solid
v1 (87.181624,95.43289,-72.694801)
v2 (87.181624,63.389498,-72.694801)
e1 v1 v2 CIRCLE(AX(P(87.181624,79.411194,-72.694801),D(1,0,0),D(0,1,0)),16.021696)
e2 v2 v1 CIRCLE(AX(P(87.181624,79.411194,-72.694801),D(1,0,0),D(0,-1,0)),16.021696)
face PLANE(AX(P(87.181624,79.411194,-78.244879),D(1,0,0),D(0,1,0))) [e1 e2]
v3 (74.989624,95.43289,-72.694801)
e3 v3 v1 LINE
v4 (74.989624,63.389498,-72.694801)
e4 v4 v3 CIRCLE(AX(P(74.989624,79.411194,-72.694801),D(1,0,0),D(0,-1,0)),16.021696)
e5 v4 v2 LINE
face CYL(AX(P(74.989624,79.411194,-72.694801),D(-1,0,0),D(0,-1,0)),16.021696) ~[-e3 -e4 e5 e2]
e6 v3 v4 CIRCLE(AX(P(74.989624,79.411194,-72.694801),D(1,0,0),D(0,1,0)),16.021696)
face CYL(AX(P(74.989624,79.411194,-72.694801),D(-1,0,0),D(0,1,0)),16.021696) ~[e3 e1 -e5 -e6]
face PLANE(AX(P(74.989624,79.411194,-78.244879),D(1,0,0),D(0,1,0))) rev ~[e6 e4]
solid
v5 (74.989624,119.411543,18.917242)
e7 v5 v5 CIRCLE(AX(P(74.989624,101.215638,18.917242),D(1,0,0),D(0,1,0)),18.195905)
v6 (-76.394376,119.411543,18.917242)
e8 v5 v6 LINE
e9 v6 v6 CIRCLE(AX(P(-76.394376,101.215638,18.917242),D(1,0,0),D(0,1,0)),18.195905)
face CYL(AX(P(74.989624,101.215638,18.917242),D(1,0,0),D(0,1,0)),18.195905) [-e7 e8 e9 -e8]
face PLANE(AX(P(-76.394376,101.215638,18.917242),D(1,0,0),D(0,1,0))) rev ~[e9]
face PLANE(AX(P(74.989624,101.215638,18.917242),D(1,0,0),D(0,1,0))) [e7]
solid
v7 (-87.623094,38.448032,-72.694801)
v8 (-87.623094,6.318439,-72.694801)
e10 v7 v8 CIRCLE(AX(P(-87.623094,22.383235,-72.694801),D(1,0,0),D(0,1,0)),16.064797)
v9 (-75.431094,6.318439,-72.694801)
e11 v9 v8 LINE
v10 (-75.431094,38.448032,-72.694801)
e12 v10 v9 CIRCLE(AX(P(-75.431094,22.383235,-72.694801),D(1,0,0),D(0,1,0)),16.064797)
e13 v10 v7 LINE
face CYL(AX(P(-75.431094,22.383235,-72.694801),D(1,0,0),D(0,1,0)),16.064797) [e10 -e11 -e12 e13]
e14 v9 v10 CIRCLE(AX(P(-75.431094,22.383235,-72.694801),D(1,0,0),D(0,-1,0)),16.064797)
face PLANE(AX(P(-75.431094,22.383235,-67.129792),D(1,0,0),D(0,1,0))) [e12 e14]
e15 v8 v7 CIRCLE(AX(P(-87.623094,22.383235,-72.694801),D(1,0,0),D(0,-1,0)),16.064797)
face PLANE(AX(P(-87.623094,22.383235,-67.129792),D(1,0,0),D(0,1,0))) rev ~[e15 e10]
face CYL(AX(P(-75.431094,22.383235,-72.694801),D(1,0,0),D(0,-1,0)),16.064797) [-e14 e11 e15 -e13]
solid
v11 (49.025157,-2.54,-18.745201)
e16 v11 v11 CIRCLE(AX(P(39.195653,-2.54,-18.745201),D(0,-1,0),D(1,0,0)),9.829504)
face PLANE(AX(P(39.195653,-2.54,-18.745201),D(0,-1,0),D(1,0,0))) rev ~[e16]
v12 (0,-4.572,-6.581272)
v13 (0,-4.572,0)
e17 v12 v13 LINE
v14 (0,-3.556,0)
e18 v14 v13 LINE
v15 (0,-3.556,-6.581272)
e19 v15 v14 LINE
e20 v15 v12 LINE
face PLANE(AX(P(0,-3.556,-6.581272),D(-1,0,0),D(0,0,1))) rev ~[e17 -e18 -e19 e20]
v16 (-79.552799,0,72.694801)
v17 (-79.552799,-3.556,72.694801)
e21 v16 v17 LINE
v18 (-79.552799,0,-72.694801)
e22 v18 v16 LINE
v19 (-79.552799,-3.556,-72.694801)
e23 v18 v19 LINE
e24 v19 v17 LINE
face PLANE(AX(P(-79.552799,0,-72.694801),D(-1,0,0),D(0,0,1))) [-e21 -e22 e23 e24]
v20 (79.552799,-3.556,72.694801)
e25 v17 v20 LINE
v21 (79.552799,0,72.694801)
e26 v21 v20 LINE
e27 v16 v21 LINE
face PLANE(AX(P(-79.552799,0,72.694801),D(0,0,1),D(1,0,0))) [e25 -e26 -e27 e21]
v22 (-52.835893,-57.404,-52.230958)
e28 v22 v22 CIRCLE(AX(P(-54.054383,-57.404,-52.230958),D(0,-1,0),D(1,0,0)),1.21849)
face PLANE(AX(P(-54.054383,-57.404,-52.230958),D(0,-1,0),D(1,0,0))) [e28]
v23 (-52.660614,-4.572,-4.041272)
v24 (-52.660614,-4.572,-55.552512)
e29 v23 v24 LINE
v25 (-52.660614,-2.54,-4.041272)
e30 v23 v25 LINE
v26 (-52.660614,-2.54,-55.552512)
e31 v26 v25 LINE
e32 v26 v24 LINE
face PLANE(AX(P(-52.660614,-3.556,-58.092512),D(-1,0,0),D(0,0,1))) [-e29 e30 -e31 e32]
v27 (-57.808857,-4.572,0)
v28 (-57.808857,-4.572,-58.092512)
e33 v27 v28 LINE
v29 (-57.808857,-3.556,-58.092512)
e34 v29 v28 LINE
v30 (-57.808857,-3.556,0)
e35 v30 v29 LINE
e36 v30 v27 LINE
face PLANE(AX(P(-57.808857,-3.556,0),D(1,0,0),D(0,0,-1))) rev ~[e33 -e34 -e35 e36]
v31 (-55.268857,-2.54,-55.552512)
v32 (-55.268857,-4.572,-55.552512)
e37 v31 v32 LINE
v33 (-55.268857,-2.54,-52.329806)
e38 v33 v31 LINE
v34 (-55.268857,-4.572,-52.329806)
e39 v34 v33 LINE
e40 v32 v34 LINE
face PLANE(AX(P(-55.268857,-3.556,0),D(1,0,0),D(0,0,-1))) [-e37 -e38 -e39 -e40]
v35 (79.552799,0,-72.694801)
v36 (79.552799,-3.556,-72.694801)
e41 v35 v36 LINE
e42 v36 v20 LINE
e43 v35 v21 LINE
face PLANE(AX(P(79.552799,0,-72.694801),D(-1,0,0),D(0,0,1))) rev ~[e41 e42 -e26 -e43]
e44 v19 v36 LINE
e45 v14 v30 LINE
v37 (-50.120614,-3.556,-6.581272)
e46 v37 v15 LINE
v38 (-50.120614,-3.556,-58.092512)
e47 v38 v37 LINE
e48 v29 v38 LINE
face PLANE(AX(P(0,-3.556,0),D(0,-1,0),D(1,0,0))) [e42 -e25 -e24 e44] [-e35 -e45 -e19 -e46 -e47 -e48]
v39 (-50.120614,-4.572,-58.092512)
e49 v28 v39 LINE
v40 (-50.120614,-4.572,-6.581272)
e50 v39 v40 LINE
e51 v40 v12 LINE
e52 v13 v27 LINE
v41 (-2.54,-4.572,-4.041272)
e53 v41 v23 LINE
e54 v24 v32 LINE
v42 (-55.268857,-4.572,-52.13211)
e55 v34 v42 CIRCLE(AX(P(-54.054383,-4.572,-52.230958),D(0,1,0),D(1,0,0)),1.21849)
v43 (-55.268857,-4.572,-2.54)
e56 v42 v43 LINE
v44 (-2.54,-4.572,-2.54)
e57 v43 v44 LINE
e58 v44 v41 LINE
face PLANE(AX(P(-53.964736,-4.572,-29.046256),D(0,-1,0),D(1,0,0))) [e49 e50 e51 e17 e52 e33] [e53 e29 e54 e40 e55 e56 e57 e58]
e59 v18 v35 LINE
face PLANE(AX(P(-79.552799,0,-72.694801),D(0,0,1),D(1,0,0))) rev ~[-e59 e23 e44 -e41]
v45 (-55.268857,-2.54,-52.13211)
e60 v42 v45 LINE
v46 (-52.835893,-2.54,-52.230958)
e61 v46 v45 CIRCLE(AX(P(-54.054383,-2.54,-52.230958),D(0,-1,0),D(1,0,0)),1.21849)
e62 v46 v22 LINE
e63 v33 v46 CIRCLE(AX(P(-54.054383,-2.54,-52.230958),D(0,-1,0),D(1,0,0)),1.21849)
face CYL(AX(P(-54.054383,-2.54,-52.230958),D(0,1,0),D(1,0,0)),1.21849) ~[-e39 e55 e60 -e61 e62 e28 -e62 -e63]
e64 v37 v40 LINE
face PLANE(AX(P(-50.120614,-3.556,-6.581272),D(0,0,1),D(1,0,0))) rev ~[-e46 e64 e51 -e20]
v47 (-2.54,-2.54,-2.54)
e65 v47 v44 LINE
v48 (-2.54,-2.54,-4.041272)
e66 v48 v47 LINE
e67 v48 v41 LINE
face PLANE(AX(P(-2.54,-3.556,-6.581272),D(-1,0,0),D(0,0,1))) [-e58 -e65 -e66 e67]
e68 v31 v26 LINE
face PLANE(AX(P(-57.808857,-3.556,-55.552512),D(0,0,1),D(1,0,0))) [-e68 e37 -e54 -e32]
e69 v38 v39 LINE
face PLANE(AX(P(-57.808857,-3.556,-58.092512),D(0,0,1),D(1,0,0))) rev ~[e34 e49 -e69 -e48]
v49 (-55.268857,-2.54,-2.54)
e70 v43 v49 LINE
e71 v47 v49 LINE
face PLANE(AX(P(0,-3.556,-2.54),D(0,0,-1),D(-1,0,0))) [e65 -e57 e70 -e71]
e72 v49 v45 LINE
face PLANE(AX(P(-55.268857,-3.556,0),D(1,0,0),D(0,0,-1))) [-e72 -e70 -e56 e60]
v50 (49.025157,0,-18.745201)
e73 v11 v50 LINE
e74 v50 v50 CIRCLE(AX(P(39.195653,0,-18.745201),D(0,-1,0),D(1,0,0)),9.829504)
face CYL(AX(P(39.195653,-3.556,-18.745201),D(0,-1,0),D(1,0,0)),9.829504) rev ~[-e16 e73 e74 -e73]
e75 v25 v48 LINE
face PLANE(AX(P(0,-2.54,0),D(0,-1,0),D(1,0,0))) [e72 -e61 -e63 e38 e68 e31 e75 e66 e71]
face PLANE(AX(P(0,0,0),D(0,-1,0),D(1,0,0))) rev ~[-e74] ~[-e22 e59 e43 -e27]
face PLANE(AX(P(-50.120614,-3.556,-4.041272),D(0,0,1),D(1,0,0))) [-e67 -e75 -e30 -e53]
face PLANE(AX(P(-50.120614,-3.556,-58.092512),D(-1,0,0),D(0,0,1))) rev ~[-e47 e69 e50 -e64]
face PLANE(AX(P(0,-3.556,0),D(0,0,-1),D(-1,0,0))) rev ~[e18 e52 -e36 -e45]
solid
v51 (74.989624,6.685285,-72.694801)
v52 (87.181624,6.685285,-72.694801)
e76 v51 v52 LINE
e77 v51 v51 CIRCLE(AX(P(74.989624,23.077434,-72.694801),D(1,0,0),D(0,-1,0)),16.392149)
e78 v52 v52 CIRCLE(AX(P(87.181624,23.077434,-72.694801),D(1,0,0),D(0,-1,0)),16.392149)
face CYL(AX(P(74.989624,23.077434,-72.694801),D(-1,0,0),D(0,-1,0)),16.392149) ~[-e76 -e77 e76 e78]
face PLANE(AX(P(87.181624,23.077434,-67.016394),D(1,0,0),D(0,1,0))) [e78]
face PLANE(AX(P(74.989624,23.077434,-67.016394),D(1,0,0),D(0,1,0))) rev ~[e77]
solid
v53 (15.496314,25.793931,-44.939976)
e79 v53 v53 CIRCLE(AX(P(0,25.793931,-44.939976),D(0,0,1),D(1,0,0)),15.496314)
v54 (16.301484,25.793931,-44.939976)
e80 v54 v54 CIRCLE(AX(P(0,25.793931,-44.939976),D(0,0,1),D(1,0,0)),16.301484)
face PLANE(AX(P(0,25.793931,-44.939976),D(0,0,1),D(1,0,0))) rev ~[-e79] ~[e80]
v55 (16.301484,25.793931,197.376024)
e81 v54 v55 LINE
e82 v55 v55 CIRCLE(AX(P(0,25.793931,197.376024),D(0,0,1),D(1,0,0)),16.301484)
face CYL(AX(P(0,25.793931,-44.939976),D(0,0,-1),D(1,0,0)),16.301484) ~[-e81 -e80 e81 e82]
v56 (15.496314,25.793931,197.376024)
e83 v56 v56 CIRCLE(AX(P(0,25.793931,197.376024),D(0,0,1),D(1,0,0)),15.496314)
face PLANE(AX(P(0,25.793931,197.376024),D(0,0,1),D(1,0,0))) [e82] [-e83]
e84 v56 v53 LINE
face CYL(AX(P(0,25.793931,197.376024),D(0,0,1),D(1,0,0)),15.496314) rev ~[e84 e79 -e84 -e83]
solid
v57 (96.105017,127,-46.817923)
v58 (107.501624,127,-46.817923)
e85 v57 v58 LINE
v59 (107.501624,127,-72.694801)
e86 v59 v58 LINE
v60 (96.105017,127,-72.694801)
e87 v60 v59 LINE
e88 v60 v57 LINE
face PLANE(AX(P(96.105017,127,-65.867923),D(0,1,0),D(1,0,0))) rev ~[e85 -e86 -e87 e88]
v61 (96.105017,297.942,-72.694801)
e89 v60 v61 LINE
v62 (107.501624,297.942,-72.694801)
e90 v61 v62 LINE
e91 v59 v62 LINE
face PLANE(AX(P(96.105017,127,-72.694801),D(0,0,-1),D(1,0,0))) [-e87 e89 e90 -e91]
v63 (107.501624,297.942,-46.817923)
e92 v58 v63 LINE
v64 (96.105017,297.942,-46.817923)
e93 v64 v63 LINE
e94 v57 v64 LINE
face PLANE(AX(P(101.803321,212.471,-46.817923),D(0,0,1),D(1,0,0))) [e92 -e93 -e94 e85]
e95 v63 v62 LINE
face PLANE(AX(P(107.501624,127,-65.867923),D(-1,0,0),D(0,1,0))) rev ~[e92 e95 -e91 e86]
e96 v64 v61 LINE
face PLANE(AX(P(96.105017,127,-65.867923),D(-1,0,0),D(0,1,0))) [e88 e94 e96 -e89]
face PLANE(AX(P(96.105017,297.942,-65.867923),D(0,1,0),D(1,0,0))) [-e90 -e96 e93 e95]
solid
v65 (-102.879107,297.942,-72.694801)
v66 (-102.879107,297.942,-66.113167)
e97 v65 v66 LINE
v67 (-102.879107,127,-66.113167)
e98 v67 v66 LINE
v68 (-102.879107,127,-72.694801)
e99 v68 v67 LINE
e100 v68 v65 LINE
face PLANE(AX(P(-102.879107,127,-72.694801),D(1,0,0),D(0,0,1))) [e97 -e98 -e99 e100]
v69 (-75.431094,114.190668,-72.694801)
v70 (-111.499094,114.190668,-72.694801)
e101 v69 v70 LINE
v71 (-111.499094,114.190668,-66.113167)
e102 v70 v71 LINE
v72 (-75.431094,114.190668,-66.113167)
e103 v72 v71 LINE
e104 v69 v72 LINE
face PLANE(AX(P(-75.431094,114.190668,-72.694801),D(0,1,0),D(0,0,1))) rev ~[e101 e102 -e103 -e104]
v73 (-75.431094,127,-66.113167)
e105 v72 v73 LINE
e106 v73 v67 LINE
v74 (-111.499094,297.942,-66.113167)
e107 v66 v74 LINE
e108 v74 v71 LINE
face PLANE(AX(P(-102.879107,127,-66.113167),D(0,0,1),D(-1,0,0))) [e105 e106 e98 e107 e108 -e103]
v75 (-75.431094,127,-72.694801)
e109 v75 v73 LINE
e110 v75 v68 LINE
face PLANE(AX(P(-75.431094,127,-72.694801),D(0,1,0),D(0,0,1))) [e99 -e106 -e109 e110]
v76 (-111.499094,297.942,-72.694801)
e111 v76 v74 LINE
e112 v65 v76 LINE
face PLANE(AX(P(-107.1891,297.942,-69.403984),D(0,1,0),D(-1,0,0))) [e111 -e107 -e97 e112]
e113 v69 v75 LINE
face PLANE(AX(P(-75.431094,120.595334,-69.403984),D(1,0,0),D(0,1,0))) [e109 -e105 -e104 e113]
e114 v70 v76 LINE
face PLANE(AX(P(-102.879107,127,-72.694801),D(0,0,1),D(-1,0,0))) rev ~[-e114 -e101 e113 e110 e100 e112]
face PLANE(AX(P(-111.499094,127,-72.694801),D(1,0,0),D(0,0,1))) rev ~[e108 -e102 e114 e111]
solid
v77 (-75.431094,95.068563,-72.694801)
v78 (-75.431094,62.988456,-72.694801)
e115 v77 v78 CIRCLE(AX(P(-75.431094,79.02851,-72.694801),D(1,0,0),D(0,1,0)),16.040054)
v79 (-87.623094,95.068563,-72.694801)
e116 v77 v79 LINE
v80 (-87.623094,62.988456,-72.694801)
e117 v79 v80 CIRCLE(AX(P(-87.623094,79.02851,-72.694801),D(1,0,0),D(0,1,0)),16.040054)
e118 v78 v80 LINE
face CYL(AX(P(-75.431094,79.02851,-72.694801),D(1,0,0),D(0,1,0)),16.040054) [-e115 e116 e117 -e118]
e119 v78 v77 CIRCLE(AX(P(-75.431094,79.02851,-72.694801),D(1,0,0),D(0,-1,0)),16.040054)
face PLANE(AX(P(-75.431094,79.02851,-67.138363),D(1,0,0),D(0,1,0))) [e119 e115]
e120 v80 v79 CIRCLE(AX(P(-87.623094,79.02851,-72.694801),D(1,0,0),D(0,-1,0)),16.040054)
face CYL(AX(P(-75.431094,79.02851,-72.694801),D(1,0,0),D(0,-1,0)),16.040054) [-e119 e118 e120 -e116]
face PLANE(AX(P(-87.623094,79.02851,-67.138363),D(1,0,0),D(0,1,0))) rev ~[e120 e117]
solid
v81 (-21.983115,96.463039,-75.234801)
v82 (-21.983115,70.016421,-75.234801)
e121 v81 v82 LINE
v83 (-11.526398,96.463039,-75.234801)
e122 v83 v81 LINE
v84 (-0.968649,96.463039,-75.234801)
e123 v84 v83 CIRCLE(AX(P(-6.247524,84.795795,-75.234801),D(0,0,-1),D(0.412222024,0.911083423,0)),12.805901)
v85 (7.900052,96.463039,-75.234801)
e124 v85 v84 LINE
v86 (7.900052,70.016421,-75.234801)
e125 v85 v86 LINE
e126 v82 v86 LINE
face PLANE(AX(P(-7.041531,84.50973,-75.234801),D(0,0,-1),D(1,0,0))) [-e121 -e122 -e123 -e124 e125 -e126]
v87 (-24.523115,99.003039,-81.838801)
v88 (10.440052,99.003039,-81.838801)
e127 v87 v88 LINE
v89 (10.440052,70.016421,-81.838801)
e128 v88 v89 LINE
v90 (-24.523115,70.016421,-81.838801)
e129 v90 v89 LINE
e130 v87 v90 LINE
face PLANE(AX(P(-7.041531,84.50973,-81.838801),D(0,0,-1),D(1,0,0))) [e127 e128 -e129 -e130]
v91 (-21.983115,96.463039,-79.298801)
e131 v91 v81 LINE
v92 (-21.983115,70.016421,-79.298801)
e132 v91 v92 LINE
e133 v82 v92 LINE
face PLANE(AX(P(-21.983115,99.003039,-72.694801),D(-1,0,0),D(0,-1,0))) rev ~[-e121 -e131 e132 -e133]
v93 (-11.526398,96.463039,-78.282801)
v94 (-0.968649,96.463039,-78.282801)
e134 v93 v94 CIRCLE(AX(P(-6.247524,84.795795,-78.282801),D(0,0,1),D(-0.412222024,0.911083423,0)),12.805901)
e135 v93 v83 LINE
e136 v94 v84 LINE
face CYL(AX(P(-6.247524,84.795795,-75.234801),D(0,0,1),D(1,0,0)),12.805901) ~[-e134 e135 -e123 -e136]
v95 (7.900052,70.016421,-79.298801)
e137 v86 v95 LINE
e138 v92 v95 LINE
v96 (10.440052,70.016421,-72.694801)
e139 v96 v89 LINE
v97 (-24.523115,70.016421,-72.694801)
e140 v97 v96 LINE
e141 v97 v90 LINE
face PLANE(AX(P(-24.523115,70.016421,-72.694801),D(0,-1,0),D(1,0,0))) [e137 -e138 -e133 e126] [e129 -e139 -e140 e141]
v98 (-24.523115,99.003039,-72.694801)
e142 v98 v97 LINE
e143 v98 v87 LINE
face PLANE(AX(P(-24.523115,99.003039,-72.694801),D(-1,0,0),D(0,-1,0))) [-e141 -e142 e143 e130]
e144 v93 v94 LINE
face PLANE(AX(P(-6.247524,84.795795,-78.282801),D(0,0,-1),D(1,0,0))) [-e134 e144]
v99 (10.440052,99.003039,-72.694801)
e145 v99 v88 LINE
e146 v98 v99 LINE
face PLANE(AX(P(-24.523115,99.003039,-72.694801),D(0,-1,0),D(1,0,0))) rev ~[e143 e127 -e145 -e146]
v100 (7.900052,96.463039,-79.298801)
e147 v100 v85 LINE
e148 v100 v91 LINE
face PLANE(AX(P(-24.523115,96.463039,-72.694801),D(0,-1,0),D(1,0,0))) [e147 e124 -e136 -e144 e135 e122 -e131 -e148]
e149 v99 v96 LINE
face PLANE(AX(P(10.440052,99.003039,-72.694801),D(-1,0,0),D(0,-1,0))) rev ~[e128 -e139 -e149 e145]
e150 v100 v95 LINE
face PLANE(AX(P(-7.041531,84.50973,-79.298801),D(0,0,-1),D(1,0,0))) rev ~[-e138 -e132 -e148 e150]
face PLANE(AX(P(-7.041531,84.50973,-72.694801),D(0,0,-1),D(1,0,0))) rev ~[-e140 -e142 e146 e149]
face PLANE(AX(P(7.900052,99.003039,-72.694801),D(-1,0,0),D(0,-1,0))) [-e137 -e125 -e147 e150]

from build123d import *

# Parameters (mm, degrees)
F0_W      = 159.1055989265
F0_H      = 145.3896015882
F1_DEPTH  = 3.556
F6_R      = 18.1959049568
F7_DEPTH  = 151.384
F13_W     = 12.8093321323
F13_H     = 6.5816342831
F14_DEPTH = 36.068
F15_W     = 8.6199865751
F15_H     = 6.5816342831
F16_DEPTH = 170.942
F18_R     = 9.8295044078
F19_DEPTH = 25.4
F20_R     = 9.9402572171
F21_DEPTH = 1.016
F24_W     = 11.3966075535
F24_H     = 6.826877594
F25_DEPTH = 170.942
F26_R     = 16.3014838399
F27_DEPTH = 242.316
F28_R     = 15.4963138216
F29_DEPTH = 245.872
F31_DEPTH = 12.192
F33_DEPTH = 12.192
F34_W     = 34.9631672725
F34_H     = 28.9866179228
F35_DEPTH = 9.144
F36_T     = -2.54
F37_R     = 12.8059007853
F38_DEPTH = 3.048
F39_W     = 11.3966075535
F39_H     = 170.942
F40_DEPTH = 19.05
F43_W     = 50.1206144691
F43_H     = 6.5812724642
F44_DEPTH = 1.016
F45_T     = -2.54
F46_R     = 1.2184903026
F47_DEPTH = 54.864


# Not quite as in the source:
# - the program builds the solid bodies; features that only make, move or delete a surface that nothing else refers to are left out


with BuildPart() as f1:
    # F0 (on Front) → F1 (new body)
    with BuildSketch(Plane.XZ):
        Rectangle(F0_W, F0_H)
    extrude(amount=F1_DEPTH)

    # F18 (on face) → F19 (cut)
    with BuildSketch(Plane.XZ.offset(3.556)):
        with Locations((39.1956530511, -18.7452007085)):
            Circle(F18_R)
    extrude(amount=-F19_DEPTH, mode=Mode.SUBTRACT)

    # F20 (on face) → F21 (join)
    with BuildSketch(Plane.XZ.offset(3.556)):
        with Locations((39.1956530511, -18.7452007085)):
            Circle(F20_R)
    extrude(amount=-F21_DEPTH)

    # F43 (on face) → F44 (join)
    with BuildSketch(Plane.XZ.offset(3.556)):
        Polygon((-57.8088574111, 0), (-57.8088574111, -58.0925121903), (-50.1206144691, -58.0925121903), (-50.1206144691, -6.5812724642), (-50.1206144691, 0), align=None)
        with Locations((-25.0603072345, -3.2906362321)):
            Rectangle(F43_W, F43_H)
    extrude(amount=F44_DEPTH)

    # F45
    f45_openings = [f1.faces().sort_by_distance(p)[0] for p in [
        (-56.989309, -4.572, -29.046256),
    ]]
    offset(amount=F45_T, openings=f45_openings, kind=Kind.INTERSECTION)

    # F46 (on face) → F47 (join)
    with BuildSketch(Plane.XZ.offset(2.54)):
        with Locations((-54.0543831885, -52.2309578955)):
            Circle(F46_R)
    extrude(amount=F47_DEPTH)


with BuildPart() as f7:
    # F6 (on face) → F7 (new body)
    with BuildSketch(Plane.YZ.offset(74.9896243215)):
        with Locations((101.2156382203, 18.9172420651)):
            Circle(F6_R)
    extrude(amount=-F7_DEPTH)


with BuildPart() as f14:
    # F13 (on face) → F14 (new body)
    with BuildSketch(Plane.YZ.offset(-75.4310935736)):
        with Locations((120.5953339338, -69.4039836526)):
            Rectangle(F13_W, F13_H)
    extrude(amount=-F14_DEPTH)

    # F15 (on face) → F16 (join)
    with BuildSketch(Plane(origin=(0, 127, 0), x_dir=(-1, 0, 0), z_dir=(0, 1, 0))):
        with Locations((107.189100286, -69.4039836526)):
            Rectangle(F15_W, F15_H)
    extrude(amount=F16_DEPTH)


with BuildPart() as f25:
    # F24 (on face) → F25 (new body)
    with BuildSketch(Plane.XZ.offset(-127)):
        with Locations((101.8033205447, -69.2813619971)):
            Rectangle(F24_W, F24_H)
    extrude(amount=-F25_DEPTH)

    # F39 (on face) → F40 (join)
    with BuildSketch(Plane.XY.offset(-65.8679232001)):
        with Locations((101.8033205447, 212.471)):
            Rectangle(F39_W, F39_H)
    extrude(amount=F40_DEPTH)


with BuildPart() as f27:
    # F26 (on face) → F27 (new body)
    with BuildSketch(Plane.XY.offset(-44.9399761856)):
        with Locations((0, 25.7939305156)):
            Circle(F26_R)
    extrude(amount=F27_DEPTH)

    # F28 (on face) → F29 (cut)
    with BuildSketch(Plane.XY.offset(197.3760238144)):
        with Locations((0, 25.7939305156)):
            Circle(F28_R)
    extrude(amount=-F29_DEPTH, mode=Mode.SUBTRACT)


with BuildPart() as f31:
    # F30 (on face) → F31 (new body)
    with BuildSketch(Plane.YZ.offset(-75.4310935736)):
        with BuildLine():
            ThreePointArc((95.0685632255, -72.6948007941), (79.0285095572, -56.6547471259), (62.988455889, -72.6948007941))
            Line((62.988455889, -72.6948007941), (95.0685632255, -72.6948007941))
        make_face()
        with BuildLine():
            Line((95.0685632255, -72.6948007941), (62.988455889, -72.6948007941))
            ThreePointArc((62.988455889, -72.6948007941), (79.0285095572, -88.7348544623), (95.0685632255, -72.6948007941))
        make_face()
    extrude(amount=-F31_DEPTH)


with BuildPart() as f31b:
    # F30 (on face) → F31, piece 2 (new body)
    with BuildSketch(Plane.YZ.offset(-75.4310935736)):
        with BuildLine():
            Line((6.31843889, -72.6948007941), (38.4480318999, -72.6948007941))
            ThreePointArc((38.4480318999, -72.6948007941), (22.383235395, -56.6300042891), (6.31843889, -72.6948007941))
        make_face()
        with BuildLine():
            ThreePointArc((6.31843889, -72.6948007941), (22.383235395, -88.7595972991), (38.4480318999, -72.6948007941))
            Line((38.4480318999, -72.6948007941), (6.31843889, -72.6948007941))
        make_face()
    extrude(amount=-F31_DEPTH)


with BuildPart() as f33:
    # F32 (on face) → F33 (new body)
    with BuildSketch(Plane.YZ.offset(74.9896243215)):
        with BuildLine():
            Line((6.6852848444, -72.6948007941), (39.4695830132, -72.6948007941))
            ThreePointArc((39.4695830132, -72.6948007941), (23.0774339288, -56.3026517097), (6.6852848444, -72.6948007941))
        make_face()
        with BuildLine():
            ThreePointArc((6.6852848444, -72.6948007941), (23.0774339288, -89.0869498785), (39.4695830132, -72.6948007941))
            Line((39.4695830132, -72.6948007941), (6.6852848444, -72.6948007941))
        make_face()
    extrude(amount=F33_DEPTH)


with BuildPart() as f33b:
    # F32 (on face) → F33, piece 2 (new body)
    with BuildSketch(Plane.YZ.offset(74.9896243215)):
        with BuildLine():
            Line((95.4328895507, -72.6948007941), (63.3894979062, -72.6948007941))
            ThreePointArc((63.3894979062, -72.6948007941), (79.4111937284, -88.7164966163), (95.4328895507, -72.6948007941))
        make_face()
        with BuildLine():
            ThreePointArc((95.4328895507, -72.6948007941), (79.4111937284, -56.6731049719), (63.3894979062, -72.6948007941))
            Line((63.3894979062, -72.6948007941), (95.4328895507, -72.6948007941))
        make_face()
    extrude(amount=F33_DEPTH)


with BuildPart() as f35:
    # F34 (on face) → F35 (new body)
    with BuildSketch(Plane(origin=(0, 0, -72.6948007941), x_dir=(1, 0, 0), z_dir=(0, 0, -1))):
        with Locations((-7.0415311493, -84.5097303391)):
            Rectangle(F34_W, F34_H)
    extrude(amount=F35_DEPTH)

    # F36
    f36_openings = [f35.faces().sort_by_distance(p)[0] for p in [
        (-7.041531, 70.016421, -77.266801),
    ]]
    offset(amount=F36_T, openings=f36_openings)

    # F37 (on face) → F38 (join)
    with BuildSketch(Plane(origin=(0, 0, -75.2348007941), x_dir=(1, 0, 0), z_dir=(0, 0, -1))):
        with Locations((-6.2475237064, -84.7957953811)):
            Circle(F37_R)
    extrude(amount=F38_DEPTH)


solid = Compound([f1.part, f7.part, f14.part, f25.part, f27.part, f31.part, f31b.part, f33.part, f33b.part, f35.part])
